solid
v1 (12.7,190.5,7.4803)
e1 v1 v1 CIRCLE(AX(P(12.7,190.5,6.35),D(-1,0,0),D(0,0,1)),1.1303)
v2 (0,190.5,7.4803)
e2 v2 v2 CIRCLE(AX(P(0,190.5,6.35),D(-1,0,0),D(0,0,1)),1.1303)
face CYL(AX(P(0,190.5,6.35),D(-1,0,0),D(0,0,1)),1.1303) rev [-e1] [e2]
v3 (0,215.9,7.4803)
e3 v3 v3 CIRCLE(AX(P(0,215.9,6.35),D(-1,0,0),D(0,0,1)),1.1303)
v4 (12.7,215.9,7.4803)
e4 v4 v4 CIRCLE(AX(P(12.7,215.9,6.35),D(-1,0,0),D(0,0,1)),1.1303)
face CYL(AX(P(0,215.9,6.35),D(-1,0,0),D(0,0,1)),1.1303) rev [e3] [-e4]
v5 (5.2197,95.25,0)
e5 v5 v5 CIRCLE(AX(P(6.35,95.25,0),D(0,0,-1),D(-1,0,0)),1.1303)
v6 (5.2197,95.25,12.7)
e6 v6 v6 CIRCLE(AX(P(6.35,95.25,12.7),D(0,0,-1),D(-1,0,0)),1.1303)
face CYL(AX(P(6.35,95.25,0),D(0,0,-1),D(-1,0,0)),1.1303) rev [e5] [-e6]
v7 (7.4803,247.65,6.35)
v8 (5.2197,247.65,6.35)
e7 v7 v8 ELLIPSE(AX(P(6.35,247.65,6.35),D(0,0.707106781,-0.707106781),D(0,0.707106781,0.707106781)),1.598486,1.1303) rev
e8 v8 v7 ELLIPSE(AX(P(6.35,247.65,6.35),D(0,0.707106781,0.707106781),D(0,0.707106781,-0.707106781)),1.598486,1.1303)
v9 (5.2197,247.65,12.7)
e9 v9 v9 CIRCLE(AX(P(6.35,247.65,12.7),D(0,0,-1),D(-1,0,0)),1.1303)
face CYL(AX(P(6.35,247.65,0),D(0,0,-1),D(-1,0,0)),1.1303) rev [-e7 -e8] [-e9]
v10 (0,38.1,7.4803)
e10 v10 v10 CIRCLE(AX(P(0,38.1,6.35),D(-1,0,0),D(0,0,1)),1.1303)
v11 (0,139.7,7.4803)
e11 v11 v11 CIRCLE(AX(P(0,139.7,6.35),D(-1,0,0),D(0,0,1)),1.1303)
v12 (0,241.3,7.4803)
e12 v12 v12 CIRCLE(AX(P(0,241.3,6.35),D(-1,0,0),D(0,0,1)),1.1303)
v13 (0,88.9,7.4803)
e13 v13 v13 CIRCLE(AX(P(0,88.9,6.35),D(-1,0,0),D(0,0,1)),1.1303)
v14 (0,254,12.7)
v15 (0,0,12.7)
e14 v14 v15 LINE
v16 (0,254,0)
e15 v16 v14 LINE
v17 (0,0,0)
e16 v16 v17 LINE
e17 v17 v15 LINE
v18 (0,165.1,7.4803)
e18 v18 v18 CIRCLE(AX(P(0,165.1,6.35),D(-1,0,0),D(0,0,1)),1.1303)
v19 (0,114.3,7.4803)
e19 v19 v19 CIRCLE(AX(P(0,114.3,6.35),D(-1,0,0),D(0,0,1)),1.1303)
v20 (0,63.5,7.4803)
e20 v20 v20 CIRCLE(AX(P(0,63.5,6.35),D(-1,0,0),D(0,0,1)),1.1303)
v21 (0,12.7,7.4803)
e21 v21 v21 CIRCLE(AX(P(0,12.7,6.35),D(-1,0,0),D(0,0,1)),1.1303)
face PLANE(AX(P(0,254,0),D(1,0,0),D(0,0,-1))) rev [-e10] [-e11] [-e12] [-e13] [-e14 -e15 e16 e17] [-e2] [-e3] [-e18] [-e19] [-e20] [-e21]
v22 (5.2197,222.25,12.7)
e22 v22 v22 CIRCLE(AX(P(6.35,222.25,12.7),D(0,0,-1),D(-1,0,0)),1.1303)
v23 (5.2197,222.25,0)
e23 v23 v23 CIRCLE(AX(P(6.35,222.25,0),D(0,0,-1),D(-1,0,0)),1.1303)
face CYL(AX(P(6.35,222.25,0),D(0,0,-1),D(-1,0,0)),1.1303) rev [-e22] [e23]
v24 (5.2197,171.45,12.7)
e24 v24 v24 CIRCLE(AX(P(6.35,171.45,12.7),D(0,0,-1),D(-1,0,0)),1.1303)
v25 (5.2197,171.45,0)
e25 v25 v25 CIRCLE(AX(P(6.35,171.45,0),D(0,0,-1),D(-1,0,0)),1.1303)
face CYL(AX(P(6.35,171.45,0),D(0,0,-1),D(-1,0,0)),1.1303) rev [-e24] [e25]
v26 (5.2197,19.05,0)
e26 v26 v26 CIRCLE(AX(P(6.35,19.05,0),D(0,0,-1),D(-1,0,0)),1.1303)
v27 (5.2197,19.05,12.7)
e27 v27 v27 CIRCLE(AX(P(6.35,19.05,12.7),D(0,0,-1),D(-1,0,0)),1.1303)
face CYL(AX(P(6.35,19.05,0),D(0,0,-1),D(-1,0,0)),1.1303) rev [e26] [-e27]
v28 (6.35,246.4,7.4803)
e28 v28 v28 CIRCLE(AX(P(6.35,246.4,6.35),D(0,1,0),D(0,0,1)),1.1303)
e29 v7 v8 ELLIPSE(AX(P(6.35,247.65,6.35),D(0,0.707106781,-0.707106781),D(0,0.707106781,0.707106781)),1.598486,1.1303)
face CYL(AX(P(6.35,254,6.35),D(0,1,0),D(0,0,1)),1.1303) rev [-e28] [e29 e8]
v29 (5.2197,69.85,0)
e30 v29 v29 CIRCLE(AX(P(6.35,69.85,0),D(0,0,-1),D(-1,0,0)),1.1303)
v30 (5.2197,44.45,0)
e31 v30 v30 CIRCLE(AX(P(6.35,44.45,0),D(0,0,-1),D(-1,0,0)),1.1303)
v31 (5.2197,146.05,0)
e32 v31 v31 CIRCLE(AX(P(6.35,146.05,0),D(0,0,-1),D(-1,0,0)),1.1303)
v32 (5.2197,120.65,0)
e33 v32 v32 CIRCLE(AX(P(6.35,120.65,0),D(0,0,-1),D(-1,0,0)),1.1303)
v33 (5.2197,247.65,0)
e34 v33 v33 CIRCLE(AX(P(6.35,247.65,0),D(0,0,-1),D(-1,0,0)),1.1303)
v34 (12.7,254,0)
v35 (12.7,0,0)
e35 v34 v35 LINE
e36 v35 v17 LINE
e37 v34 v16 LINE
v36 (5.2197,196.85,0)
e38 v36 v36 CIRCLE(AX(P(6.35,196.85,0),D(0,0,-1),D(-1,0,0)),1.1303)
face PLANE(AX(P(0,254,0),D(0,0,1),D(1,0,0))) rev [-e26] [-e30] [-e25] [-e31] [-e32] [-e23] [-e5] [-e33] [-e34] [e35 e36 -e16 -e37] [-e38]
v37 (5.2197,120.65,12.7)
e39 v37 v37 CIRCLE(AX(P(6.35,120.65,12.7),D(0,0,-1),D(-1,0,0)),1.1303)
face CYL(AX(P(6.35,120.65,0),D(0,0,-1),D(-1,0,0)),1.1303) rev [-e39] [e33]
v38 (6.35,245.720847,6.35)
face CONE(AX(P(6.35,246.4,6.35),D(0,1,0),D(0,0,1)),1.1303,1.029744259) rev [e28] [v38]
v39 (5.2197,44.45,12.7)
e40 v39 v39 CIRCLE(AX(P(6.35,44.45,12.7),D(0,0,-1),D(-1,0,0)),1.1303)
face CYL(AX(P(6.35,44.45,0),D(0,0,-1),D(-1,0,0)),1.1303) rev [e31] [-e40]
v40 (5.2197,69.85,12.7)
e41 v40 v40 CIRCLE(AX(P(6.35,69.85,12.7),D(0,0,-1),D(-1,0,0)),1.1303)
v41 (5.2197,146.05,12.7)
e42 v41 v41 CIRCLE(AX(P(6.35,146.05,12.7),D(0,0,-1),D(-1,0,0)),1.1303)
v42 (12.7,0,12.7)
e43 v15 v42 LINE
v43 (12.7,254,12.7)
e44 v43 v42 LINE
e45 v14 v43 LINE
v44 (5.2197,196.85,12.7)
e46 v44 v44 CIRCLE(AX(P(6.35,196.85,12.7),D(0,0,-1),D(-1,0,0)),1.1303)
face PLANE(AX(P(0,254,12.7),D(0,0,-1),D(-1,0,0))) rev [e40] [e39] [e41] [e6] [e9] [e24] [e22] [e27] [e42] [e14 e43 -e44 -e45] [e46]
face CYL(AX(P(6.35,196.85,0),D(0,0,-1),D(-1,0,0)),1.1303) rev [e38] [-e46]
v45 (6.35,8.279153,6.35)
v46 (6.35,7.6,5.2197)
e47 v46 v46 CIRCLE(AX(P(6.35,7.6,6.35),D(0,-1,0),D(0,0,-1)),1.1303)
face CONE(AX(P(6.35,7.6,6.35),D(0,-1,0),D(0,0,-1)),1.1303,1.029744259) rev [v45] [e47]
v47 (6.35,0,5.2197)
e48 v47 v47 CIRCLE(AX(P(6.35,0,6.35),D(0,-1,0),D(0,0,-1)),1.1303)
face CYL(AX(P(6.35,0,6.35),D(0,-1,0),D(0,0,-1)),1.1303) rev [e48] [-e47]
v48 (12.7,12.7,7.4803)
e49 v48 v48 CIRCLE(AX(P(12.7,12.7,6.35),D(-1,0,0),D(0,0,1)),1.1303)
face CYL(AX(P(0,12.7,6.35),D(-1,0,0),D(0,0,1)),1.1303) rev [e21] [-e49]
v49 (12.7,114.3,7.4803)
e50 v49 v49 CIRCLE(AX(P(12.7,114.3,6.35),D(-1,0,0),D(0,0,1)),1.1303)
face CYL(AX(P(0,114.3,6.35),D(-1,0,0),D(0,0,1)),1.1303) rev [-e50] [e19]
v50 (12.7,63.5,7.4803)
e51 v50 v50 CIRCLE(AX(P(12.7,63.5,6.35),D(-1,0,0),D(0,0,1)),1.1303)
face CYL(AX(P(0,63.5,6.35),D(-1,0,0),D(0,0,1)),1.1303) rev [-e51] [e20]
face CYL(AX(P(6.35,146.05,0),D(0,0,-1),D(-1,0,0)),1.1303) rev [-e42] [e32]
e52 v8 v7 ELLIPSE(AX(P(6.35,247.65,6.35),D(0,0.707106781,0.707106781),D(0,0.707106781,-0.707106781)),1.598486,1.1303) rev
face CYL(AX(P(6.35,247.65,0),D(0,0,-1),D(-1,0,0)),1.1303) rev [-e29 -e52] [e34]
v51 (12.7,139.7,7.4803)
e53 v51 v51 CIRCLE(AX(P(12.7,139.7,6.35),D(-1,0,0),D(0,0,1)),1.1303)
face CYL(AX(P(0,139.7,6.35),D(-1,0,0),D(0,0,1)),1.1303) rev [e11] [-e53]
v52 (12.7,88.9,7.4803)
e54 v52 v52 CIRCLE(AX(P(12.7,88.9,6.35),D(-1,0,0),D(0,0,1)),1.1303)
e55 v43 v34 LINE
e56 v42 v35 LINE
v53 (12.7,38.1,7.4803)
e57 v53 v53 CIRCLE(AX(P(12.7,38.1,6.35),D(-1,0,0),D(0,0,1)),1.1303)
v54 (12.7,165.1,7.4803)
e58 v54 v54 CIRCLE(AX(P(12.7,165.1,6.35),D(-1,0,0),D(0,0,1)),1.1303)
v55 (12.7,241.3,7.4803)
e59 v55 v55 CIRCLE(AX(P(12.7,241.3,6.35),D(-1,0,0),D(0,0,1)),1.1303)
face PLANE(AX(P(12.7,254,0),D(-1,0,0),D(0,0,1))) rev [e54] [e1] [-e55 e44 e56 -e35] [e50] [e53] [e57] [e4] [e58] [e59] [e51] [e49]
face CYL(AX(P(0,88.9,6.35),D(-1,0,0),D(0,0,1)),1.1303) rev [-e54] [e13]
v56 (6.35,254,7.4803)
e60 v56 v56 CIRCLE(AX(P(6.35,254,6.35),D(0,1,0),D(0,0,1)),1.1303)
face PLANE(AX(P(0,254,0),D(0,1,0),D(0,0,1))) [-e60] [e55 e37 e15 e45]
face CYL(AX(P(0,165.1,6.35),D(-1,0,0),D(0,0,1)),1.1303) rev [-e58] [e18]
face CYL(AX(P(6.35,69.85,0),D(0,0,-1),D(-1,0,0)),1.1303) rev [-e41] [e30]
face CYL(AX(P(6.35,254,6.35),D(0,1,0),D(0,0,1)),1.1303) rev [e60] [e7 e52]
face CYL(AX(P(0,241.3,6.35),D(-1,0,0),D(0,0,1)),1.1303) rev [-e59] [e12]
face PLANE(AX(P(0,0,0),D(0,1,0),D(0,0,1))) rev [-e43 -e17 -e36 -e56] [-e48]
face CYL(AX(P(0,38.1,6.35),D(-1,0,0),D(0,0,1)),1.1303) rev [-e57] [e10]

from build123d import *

# Parameters (mm, degrees)
SKETCH1_W                           = 12.7
SKETCH1_H                           = 12.7
BOSS_EXTRUDE1_DEPTH                 = 254
F_4_40_TAPPED_HOLE1_D               = 2.2606
F_4_40_TAPPED_HOLE1_DEPTH           = 7.6
F_4_40_TAPPED_HOLE1_TIP             = 0.679152758
F_4_40_TAPPED_HOLE1_ON_FACE_2_D     = 2.2606
F_4_40_TAPPED_HOLE1_ON_FACE_2_DEPTH = 7.6
F_4_40_TAPPED_HOLE1_ON_FACE_2_TIP   = 0.679152758
F_4_40_TAPPED_HOLE2_D               = 2.2606
LPATTERN1_COUNT                     = 10
LPATTERN1_PITCH                     = 25.4
F_4_40_TAPPED_HOLE3_OUTLINE_R       = 1.1303
F_4_40_TAPPED_HOLE3_DEPTH           = 12.7
LPATTERN2_COUNT                     = 10
LPATTERN2_PITCH                     = 25.4


# Read off the part's stored shape, not the designer's step: #4-40 Tapped Hole3
with BuildPart() as part:
    # Sketch1 → Boss-Extrude1 (new body)
    with BuildSketch(Plane(origin=(0, 0, 0), x_dir=(1, 0, 0), z_dir=(0, 1, 0))):
        with Locations((6.35, -6.35)):
            Rectangle(SKETCH1_W, SKETCH1_H)
    extrude(amount=BOSS_EXTRUDE1_DEPTH)

    # #4-40 Tapped Hole1
    with Locations(Plane(origin=(6.35, 254, 6.35), x_dir=(0, 0, 1), z_dir=(0, 1, 0))):
        with Locations((0, 0)):
            Hole(F_4_40_TAPPED_HOLE1_D / 2, depth=F_4_40_TAPPED_HOLE1_DEPTH)
            with Locations((0, 0, -(F_4_40_TAPPED_HOLE1_DEPTH + F_4_40_TAPPED_HOLE1_TIP / 2))):  # 118° drill point
                Cone(0, F_4_40_TAPPED_HOLE1_D / 2, F_4_40_TAPPED_HOLE1_TIP, mode=Mode.SUBTRACT)

    # #4-40 Tapped Hole1 on face 2
    with Locations(Plane(origin=(6.35, 0, 6.35), x_dir=(0, 0, -1), z_dir=(0, -1, 0))):
        with Locations((0, 0)):
            Hole(F_4_40_TAPPED_HOLE1_ON_FACE_2_D / 2, depth=F_4_40_TAPPED_HOLE1_ON_FACE_2_DEPTH)
            with Locations((0, 0, -(F_4_40_TAPPED_HOLE1_ON_FACE_2_DEPTH + F_4_40_TAPPED_HOLE1_ON_FACE_2_TIP / 2))):  # 118° drill point
                Cone(0, F_4_40_TAPPED_HOLE1_ON_FACE_2_D / 2, F_4_40_TAPPED_HOLE1_ON_FACE_2_TIP, mode=Mode.SUBTRACT)

    # #4-40 Tapped Hole2 (through all)
    with Locations(Plane(origin=(6.35, 247.65, 0), x_dir=(-1, 0, 0), z_dir=(0, 0, -1))):
        with Locations((0, 0)):
            f_4_40_tapped_hole2 = Hole(F_4_40_TAPPED_HOLE2_D / 2)

    # LPattern1: #4-40 Tapped Hole2 ×10
    with Locations(*[(0, -i * LPATTERN1_PITCH, 0) for i in range(1, LPATTERN1_COUNT)]):
        add(f_4_40_tapped_hole2, mode=Mode.SUBTRACT)

    # #4-40 Tapped Hole3 outline → #4-40 Tapped Hole3 (cut)
    with BuildSketch(Plane.YZ):
        with Locations((241.3, 6.35)):
            Circle(F_4_40_TAPPED_HOLE3_OUTLINE_R)
    f_4_40_tapped_hole3 = extrude(amount=F_4_40_TAPPED_HOLE3_DEPTH, mode=Mode.SUBTRACT)

    # LPattern2: #4-40 Tapped Hole3 ×10
    with Locations(*[(0, -i * LPATTERN2_PITCH, 0) for i in range(1, LPATTERN2_COUNT)]):
        add(f_4_40_tapped_hole3, mode=Mode.SUBTRACT)


solid = part.part
